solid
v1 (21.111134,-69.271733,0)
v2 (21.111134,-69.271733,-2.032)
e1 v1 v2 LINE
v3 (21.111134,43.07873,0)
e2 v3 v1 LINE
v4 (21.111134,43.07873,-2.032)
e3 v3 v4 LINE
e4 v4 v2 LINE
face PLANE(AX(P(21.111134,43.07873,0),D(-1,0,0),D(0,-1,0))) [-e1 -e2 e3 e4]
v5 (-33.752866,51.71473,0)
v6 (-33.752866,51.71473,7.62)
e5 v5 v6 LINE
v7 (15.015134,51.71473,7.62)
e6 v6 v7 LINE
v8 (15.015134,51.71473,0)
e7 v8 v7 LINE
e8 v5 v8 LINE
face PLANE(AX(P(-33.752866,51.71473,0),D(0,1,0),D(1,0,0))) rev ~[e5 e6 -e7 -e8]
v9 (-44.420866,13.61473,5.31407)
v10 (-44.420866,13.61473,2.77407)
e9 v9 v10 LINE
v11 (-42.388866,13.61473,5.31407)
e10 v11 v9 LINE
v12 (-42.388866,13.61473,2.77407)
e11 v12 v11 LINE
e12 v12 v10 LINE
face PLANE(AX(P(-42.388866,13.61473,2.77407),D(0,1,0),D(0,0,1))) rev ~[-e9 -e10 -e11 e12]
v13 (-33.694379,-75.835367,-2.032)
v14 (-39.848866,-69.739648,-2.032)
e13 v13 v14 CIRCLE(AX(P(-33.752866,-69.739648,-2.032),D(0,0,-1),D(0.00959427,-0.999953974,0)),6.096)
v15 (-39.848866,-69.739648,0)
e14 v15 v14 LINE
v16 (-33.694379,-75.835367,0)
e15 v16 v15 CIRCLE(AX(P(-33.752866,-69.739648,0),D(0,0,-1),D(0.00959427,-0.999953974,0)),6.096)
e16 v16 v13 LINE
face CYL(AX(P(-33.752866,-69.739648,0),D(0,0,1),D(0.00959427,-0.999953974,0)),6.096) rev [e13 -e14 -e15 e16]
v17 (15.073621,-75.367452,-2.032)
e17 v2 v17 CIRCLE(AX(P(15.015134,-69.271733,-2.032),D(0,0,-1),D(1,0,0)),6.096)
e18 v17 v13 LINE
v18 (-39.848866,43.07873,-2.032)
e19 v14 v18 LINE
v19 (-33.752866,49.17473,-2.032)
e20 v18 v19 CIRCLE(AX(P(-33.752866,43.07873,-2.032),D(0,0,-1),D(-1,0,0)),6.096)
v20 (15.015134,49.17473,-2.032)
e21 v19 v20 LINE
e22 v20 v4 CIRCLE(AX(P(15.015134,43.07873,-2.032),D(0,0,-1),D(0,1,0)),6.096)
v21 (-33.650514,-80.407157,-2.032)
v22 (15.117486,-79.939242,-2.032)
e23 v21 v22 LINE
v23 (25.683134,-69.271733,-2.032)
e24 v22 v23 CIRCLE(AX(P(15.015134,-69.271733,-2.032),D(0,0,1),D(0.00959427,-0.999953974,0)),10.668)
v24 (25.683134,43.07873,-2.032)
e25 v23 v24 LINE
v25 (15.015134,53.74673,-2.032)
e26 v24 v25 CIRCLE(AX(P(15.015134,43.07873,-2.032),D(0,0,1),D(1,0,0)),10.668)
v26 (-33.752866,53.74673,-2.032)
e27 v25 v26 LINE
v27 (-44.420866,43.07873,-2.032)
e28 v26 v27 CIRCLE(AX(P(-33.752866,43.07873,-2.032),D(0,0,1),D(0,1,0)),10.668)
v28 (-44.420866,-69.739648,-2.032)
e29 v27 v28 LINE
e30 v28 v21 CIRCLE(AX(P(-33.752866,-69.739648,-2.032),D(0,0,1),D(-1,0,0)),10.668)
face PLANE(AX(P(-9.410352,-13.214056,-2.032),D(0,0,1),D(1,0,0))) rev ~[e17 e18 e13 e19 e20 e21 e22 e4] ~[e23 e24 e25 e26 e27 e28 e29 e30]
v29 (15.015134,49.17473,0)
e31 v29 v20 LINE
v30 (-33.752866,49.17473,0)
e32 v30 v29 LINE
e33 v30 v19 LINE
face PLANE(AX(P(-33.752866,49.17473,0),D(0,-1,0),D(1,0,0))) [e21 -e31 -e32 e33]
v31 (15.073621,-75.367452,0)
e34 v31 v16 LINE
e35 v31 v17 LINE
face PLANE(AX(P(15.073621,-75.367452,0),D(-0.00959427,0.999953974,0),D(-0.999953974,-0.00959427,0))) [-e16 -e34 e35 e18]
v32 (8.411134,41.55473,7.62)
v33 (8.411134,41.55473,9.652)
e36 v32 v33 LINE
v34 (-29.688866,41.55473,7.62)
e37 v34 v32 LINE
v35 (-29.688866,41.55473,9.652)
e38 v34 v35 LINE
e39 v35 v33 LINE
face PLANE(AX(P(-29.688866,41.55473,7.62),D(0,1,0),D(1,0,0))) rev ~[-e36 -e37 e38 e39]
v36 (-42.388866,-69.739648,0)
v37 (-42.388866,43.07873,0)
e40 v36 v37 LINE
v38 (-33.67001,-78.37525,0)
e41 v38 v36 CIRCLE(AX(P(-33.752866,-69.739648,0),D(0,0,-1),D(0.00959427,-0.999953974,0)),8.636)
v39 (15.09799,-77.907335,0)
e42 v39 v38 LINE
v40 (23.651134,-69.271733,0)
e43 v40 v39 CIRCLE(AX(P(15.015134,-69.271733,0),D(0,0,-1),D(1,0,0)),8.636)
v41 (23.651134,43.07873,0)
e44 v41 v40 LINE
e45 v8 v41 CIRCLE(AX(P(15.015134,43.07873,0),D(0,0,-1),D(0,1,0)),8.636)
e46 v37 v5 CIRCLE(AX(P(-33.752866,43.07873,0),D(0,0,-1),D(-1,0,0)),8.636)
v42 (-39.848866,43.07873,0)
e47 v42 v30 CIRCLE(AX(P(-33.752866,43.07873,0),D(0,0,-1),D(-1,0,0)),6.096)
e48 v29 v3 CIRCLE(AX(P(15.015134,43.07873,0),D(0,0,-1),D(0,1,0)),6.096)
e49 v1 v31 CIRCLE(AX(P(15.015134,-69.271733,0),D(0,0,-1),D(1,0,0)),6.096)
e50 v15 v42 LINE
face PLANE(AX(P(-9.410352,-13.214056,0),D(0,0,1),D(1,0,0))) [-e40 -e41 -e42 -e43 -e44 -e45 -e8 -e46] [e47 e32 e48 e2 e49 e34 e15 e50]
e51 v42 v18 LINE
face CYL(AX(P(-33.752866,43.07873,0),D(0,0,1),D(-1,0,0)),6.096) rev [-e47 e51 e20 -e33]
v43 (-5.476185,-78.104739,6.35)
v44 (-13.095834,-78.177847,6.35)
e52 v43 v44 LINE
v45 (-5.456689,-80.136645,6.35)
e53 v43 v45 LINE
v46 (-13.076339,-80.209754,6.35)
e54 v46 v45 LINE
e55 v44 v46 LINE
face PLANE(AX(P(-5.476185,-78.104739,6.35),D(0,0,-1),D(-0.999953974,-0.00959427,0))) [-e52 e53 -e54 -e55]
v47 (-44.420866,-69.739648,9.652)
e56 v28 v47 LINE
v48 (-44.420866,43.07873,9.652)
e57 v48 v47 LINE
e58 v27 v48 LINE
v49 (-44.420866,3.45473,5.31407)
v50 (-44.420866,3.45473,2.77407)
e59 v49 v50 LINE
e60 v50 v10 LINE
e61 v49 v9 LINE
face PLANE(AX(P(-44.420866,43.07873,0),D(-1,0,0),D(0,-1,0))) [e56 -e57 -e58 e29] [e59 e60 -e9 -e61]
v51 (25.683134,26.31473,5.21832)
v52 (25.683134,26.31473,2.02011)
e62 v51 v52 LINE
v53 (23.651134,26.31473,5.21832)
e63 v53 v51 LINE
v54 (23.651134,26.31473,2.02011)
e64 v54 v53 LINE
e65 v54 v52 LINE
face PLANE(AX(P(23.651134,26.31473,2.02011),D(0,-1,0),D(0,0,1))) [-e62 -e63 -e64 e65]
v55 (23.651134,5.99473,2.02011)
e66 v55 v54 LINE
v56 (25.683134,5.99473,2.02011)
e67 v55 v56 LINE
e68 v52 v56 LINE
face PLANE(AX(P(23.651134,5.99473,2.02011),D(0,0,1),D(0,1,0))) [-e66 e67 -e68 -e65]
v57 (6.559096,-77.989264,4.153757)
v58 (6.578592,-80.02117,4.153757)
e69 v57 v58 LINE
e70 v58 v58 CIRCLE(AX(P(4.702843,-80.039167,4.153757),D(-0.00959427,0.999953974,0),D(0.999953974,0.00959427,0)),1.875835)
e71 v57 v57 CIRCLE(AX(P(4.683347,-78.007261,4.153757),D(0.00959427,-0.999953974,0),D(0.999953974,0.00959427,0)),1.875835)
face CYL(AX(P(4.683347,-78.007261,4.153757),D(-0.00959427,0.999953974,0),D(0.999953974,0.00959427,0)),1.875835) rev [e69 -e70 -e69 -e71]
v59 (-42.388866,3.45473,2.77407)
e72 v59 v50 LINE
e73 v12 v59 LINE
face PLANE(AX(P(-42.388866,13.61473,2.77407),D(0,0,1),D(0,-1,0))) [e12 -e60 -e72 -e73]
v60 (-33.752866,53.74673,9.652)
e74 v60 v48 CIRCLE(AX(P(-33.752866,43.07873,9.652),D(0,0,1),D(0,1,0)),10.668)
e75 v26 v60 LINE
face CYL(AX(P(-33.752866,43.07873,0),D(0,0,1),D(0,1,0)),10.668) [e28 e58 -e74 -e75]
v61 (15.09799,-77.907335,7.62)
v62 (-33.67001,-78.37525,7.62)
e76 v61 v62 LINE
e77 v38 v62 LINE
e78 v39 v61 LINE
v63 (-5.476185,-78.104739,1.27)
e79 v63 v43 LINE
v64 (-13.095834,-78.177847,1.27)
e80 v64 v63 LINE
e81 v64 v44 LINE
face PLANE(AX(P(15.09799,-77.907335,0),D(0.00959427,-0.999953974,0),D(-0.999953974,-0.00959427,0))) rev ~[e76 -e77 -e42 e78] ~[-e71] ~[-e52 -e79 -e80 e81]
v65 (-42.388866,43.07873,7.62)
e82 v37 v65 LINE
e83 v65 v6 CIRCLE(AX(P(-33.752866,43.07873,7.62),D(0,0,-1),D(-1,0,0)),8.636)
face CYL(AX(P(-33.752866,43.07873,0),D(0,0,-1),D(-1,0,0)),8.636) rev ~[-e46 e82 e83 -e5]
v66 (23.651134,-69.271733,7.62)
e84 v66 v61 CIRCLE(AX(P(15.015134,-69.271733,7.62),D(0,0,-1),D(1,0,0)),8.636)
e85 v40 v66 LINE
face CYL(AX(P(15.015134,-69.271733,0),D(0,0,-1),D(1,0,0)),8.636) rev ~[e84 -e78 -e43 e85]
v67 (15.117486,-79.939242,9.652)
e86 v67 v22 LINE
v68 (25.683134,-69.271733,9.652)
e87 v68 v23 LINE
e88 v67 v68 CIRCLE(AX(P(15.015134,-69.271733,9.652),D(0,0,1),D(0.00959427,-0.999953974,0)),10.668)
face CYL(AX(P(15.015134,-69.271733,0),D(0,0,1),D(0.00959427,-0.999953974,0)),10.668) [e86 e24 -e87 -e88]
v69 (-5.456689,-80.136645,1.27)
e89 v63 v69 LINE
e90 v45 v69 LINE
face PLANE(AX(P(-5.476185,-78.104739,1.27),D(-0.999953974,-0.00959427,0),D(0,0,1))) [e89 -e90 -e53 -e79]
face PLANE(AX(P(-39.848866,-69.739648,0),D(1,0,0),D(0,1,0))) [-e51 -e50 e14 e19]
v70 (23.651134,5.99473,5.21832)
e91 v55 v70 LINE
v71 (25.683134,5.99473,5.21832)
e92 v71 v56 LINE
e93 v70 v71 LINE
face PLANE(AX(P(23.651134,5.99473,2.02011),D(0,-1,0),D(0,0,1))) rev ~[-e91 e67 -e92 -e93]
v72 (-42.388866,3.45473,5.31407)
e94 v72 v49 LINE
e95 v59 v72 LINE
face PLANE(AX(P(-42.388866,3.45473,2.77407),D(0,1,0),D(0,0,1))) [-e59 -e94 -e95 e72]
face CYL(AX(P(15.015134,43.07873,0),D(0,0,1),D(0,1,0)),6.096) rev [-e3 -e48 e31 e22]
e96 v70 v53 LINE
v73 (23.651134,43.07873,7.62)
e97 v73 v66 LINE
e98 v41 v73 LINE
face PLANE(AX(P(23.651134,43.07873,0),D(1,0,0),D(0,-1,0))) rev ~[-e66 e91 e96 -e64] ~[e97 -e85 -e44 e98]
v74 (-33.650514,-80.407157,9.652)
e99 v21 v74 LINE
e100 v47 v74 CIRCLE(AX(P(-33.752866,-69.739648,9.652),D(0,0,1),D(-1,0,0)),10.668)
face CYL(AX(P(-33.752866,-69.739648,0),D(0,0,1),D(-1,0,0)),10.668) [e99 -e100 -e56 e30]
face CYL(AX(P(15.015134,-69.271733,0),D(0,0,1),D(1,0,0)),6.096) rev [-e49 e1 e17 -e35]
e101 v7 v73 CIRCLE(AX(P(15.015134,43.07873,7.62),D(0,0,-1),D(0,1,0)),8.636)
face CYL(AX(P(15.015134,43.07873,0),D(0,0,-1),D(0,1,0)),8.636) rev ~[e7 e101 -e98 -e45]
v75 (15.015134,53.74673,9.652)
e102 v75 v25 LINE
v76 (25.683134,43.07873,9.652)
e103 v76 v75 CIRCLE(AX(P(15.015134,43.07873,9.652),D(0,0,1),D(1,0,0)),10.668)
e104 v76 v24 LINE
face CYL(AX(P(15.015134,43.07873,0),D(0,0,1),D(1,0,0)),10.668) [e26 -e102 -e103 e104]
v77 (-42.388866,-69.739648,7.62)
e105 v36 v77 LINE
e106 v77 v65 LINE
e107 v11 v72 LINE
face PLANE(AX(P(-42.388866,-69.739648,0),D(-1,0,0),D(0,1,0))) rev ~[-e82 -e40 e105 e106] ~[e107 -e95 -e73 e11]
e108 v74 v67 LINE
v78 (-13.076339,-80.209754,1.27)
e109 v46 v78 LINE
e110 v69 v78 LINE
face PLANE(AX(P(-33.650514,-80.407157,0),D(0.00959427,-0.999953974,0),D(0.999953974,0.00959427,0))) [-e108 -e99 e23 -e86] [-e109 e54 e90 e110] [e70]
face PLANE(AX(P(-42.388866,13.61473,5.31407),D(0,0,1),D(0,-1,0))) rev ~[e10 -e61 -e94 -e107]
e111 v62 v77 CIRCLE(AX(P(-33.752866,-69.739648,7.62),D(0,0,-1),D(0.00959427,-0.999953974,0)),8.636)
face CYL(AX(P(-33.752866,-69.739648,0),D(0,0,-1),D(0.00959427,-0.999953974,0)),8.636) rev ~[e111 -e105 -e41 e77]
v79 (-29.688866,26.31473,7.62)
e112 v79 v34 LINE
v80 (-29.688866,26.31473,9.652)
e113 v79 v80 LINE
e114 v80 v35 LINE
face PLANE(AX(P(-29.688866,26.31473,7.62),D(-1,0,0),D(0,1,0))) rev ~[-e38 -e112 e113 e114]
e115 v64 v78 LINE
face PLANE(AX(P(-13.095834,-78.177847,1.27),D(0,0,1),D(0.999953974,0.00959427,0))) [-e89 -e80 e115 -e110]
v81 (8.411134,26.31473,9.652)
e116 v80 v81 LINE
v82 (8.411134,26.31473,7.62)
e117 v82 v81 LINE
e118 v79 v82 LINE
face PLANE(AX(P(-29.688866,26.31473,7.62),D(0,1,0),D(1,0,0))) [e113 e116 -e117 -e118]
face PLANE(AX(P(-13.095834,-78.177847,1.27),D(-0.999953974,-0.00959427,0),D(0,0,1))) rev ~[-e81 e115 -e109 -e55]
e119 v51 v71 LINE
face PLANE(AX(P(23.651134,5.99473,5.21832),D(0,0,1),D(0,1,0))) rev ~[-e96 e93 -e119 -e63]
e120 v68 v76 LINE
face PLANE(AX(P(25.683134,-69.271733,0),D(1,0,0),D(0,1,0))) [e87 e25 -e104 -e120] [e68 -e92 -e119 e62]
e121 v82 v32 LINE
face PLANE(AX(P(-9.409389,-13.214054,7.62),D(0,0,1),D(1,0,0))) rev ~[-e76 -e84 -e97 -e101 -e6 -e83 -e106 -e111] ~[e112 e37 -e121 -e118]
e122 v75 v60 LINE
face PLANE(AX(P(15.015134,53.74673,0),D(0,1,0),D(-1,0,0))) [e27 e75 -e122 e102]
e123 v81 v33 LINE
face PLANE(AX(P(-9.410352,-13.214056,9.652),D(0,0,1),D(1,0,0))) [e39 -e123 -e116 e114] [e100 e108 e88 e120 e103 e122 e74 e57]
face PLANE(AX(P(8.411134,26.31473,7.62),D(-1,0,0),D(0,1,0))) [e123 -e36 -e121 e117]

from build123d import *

# Parameters (mm, degrees)
F0_W       = 38.1
F0_H       = 15.24
F1_DEPTH   = 7.62
F2_W       = 20.32
F2_H       = 3.1982096843
F3_DEPTH   = 25.4
F5_W       = 10.16
F5_H       = 2.54
F6_DEPTH   = 25.4
F4_W       = 3.81
F4_H       = 5.08
F4_R       = 1.8758350377
F7_DEPTH   = 25.4
F8_DEPTH   = 7.62
F1_FACE3_W = 38.1
F1_FACE3_H = 15.24
F9_DEPTH   = 2.032
F10_DEPTH  = 2.032


with BuildPart() as f1:
    # F0 (on Top) → F1 (new body)
    with BuildSketch(Plane.XY):
        with BuildLine():
            Line((15.0151342493, 51.7147295177), (-33.7528657507, 51.7147295177))
            ThreePointArc((-33.7528657507, 51.7147295177), (-39.8594399131, 49.18530368), (-42.3888657507, 43.0787295177))
            Line((-42.3888657507, 43.0787295177), (-42.3888657507, -69.7396477934))
            ThreePointArc((-42.3888657507, -69.7396477934), (-39.8300752503, -75.8754460869), (-33.6700096372, -78.3752503123))
            Line((-33.6700096372, -78.3752503123), (15.0979903628, -77.9073354291))
            ThreePointArc((15.0979903628, -77.9073354291), (21.1509325427, -75.3489424097), (23.6511342493, -69.2717329101))
            Line((23.6511342493, -69.2717329101), (23.6511342493, 43.0787295177))
            ThreePointArc((23.6511342493, 43.0787295177), (21.1217084116, 49.18530368), (15.0151342493, 51.7147295177))
        make_face()
        with BuildLine():
            ThreePointArc((-39.8488657507, 43.0787295177), (-38.0633886888, 47.3892524558), (-33.7528657507, 49.1747295177))
            Line((-33.7528657507, 49.1747295177), (15.0151342493, 49.1747295177))
            ThreePointArc((15.0151342493, 49.1747295177), (19.3256571874, 47.3892524558), (21.1111342493, 43.0787295177))
            Line((21.1111342493, 43.0787295177), (21.1111342493, -69.2717329101))
            ThreePointArc((21.1111342493, -69.2717329101), (19.3462859858, -73.561527851), (15.0736209176, -75.3674523353))
            Line((15.0736209176, -75.3674523353), (-33.6943790824, -75.8353672185))
            ThreePointArc((-33.6943790824, -75.8353672185), (-38.0426606916, -74.07079953), (-39.8488657507, -69.7396477934))
            Line((-39.8488657507, -69.7396477934), (-39.8488657507, 43.0787295177))
        make_face(mode=Mode.SUBTRACT)
        with BuildLine():
            Line((15.0151342493, 49.1747295177), (-33.7528657507, 49.1747295177))
            ThreePointArc((-33.7528657507, 49.1747295177), (-38.0633886888, 47.3892524558), (-39.8488657507, 43.0787295177))
            Line((-39.8488657507, 43.0787295177), (-39.8488657507, -69.7396477934))
            ThreePointArc((-39.8488657507, -69.7396477934), (-38.0426606916, -74.07079953), (-33.6943790824, -75.8353672185))
            Line((-33.6943790824, -75.8353672185), (15.0736209176, -75.3674523353))
            ThreePointArc((15.0736209176, -75.3674523353), (19.3462859858, -73.561527851), (21.1111342493, -69.2717329101))
            Line((21.1111342493, -69.2717329101), (21.1111342493, 43.0787295177))
            ThreePointArc((21.1111342493, 43.0787295177), (19.3256571874, 47.3892524558), (15.0151342493, 49.1747295177))
        make_face()
        with Locations((-10.6388657507, 33.9347295177)):
            Rectangle(F0_W, F0_H, mode=Mode.SUBTRACT)
    extrude(amount=F1_DEPTH)

    # F2 (on face) → F3 (join)
    with BuildSketch(Plane.YZ.offset(23.6511342493)):
        with Locations((16.1547295177, 3.6192152184)):
            Rectangle(F2_W, F2_H)
    extrude(amount=F3_DEPTH)

    # F5 (on face) → F6 (join)
    with BuildSketch(Plane(origin=(-42.3888657507, 0, 0), x_dir=(0, -1, 0), z_dir=(-1, 0, 0))):
        with Locations((-8.5347295177, 4.0440695514)):
            Rectangle(F5_W, F5_H)
    extrude(amount=F6_DEPTH)

    # F4 (on face) → F7 (join)
    with BuildSketch(Plane(origin=(0.7488193587, -78.045011583, 0), x_dir=(0.9999539739, 0.0095942697, 0), z_dir=(0.0095942697, -0.9999539739, 0))):
        with Locations((-11.9402908808, 3.81)):
            Rectangle(F4_W, F4_H)
        with Locations((-8.1302908808, 3.81)):
            Rectangle(F4_W, F4_H)
        with Locations((3.9347091192, 4.1537573561)):
            Circle(F4_R)
    extrude(amount=F7_DEPTH)


with BuildPart() as f8:
    # F0 (on Top) → F8 (new body, through all)
    with BuildSketch(Plane.XY):
        with BuildLine():
            Line((15.0151342493, 53.7467295177), (-33.7528657507, 53.7467295177))
            ThreePointArc((-33.7528657507, 53.7467295177), (-41.2962808924, 50.6221446594), (-44.4208657507, 43.0787295177))
            Line((-44.4208657507, 43.0787295177), (-44.4208657507, -69.7396477934))
            ThreePointArc((-44.4208657507, -69.7396477934), (-41.2600068973, -77.3191633324), (-33.6505140811, -80.4071567873))
            Line((-33.6505140811, -80.4071567873), (15.1174859189, -79.9392419041))
            ThreePointArc((15.1174859189, -79.9392419041), (22.5946497883, -76.7788740567), (25.6831342493, -69.2717329101))
            Line((25.6831342493, -69.2717329101), (25.6831342493, 43.0787295177))
            ThreePointArc((25.6831342493, 43.0787295177), (22.558549391, 50.6221446594), (15.0151342493, 53.7467295177))
        make_face()
        with BuildLine():
            ThreePointArc((-42.3888657507, 43.0787295177), (-39.8594399131, 49.18530368), (-33.7528657507, 51.7147295177))
            Line((-33.7528657507, 51.7147295177), (15.0151342493, 51.7147295177))
            ThreePointArc((15.0151342493, 51.7147295177), (21.1217084116, 49.18530368), (23.6511342493, 43.0787295177))
            Line((23.6511342493, 43.0787295177), (23.6511342493, -69.2717329101))
            ThreePointArc((23.6511342493, -69.2717329101), (21.1509325427, -75.3489424097), (15.0979903628, -77.9073354291))
            Line((15.0979903628, -77.9073354291), (-33.6700096372, -78.3752503123))
            ThreePointArc((-33.6700096372, -78.3752503123), (-39.8300752503, -75.8754460869), (-42.3888657507, -69.7396477934))
            Line((-42.3888657507, -69.7396477934), (-42.3888657507, 43.0787295177))
        make_face(mode=Mode.SUBTRACT)
    extrude(amount=F8_DEPTH)

    # F8_face (on face) + F1_face3 (on face) → F9 (join)
    with BuildSketch(Plane(origin=(-9.4104092831, -13.214065849, 7.62), x_dir=(1, 0, 0), z_dir=(0, 0, 1))):
        with BuildLine():
            Line((35.0935435324, -56.0576670611), (35.0935435324, 56.2927953667))
            ThreePointArc((35.0935435324, 56.2927953667), (31.9689586741, 63.8362105084), (24.4255435324, 66.9607953667))
            Line((24.4255435324, 66.9607953667), (-24.3424564676, 66.9607953667))
            ThreePointArc((-24.3424564676, 66.9607953667), (-31.8858716093, 63.8362105084), (-35.0104564676, 56.2927953667))
            Line((-35.0104564676, 56.2927953667), (-35.0104564676, -56.5255819444))
            ThreePointArc((-35.0104564676, -56.5255819444), (-31.8495976142, -64.1050974834), (-24.240104798, -67.1930909383))
            Line((-24.240104798, -67.1930909383), (24.527895202, -66.7251760551))
            ThreePointArc((24.527895202, -66.7251760551), (32.0050590714, -63.5648082077), (35.0935435324, -56.0576670611))
        make_face()
        with BuildLine():
            ThreePointArc((-32.9784564676, 56.2927953667), (-30.4490306299, 62.399369529), (-24.3424564676, 64.9287953667))
            Line((-24.3424564676, 64.9287953667), (24.4255435324, 64.9287953667))
            ThreePointArc((24.4255435324, 64.9287953667), (30.5321176947, 62.399369529), (33.0615435324, 56.2927953667))
            Line((33.0615435324, 56.2927953667), (33.0615435324, -56.0576670611))
            ThreePointArc((33.0615435324, -56.0576670611), (30.5613418259, -62.1348765607), (24.5083996459, -64.69326958))
            Line((24.5083996459, -64.69326958), (-24.2596003541, -65.1611844633))
            ThreePointArc((-24.2596003541, -65.1611844633), (-30.4196659672, -62.6613802378), (-32.9784564676, -56.5255819444))
            Line((-32.9784564676, -56.5255819444), (-32.9784564676, 56.2927953667))
        make_face(mode=Mode.SUBTRACT)
    with BuildSketch(Plane(origin=(-9.3022040754, -16.6655356146, 7.62), x_dir=(1, 0, 0), z_dir=(0, 0, 1))):
        with BuildLine():
            ThreePointArc((32.9533383247, 59.7442651323), (30.423912487, 65.8508392946), (24.3173383247, 68.3802651323))
            Line((24.3173383247, 68.3802651323), (-24.4506616753, 68.3802651323))
            ThreePointArc((-24.4506616753, 68.3802651323), (-30.5572358376, 65.8508392946), (-33.0866616753, 59.7442651323))
            Line((-33.0866616753, 59.7442651323), (-33.0866616753, -53.0741121788))
            ThreePointArc((-33.0866616753, -53.0741121788), (-30.5278711749, -59.2099104723), (-24.3678055618, -61.7097146977))
            Line((-24.3678055618, -61.7097146977), (24.4001944382, -61.2417998145))
            ThreePointArc((24.4001944382, -61.2417998145), (30.4531366182, -58.6834067951), (32.9533383247, -52.6061972956))
            Line((32.9533383247, -52.6061972956), (32.9533383247, 59.7442651323))
        make_face()
        with Locations((-1.3366616753, 50.6002651323)):
            Rectangle(F1_FACE3_W, F1_FACE3_H, mode=Mode.SUBTRACT)
    extrude(amount=F9_DEPTH)

    # F0 (on Top) → F10 (join)
    with BuildSketch(Plane.XY):
        with BuildLine():
            Line((15.0151342493, 53.7467295177), (-33.7528657507, 53.7467295177))
            ThreePointArc((-33.7528657507, 53.7467295177), (-41.2962808924, 50.6221446594), (-44.4208657507, 43.0787295177))
            Line((-44.4208657507, 43.0787295177), (-44.4208657507, -69.7396477934))
            ThreePointArc((-44.4208657507, -69.7396477934), (-41.2600068973, -77.3191633324), (-33.6505140811, -80.4071567873))
            Line((-33.6505140811, -80.4071567873), (15.1174859189, -79.9392419041))
            ThreePointArc((15.1174859189, -79.9392419041), (22.5946497883, -76.7788740567), (25.6831342493, -69.2717329101))
            Line((25.6831342493, -69.2717329101), (25.6831342493, 43.0787295177))
            ThreePointArc((25.6831342493, 43.0787295177), (22.558549391, 50.6221446594), (15.0151342493, 53.7467295177))
        make_face()
        with BuildLine():
            ThreePointArc((-42.3888657507, 43.0787295177), (-39.8594399131, 49.18530368), (-33.7528657507, 51.7147295177))
            Line((-33.7528657507, 51.7147295177), (15.0151342493, 51.7147295177))
            ThreePointArc((15.0151342493, 51.7147295177), (21.1217084116, 49.18530368), (23.6511342493, 43.0787295177))
            Line((23.6511342493, 43.0787295177), (23.6511342493, -69.2717329101))
            ThreePointArc((23.6511342493, -69.2717329101), (21.1509325427, -75.3489424097), (15.0979903628, -77.9073354291))
            Line((15.0979903628, -77.9073354291), (-33.6700096372, -78.3752503123))
            ThreePointArc((-33.6700096372, -78.3752503123), (-39.8300752503, -75.8754460869), (-42.3888657507, -69.7396477934))
            Line((-42.3888657507, -69.7396477934), (-42.3888657507, 43.0787295177))
        make_face(mode=Mode.SUBTRACT)
        with BuildLine():
            Line((15.0151342493, 51.7147295177), (-33.7528657507, 51.7147295177))
            ThreePointArc((-33.7528657507, 51.7147295177), (-39.8594399131, 49.18530368), (-42.3888657507, 43.0787295177))
            Line((-42.3888657507, 43.0787295177), (-42.3888657507, -69.7396477934))
            ThreePointArc((-42.3888657507, -69.7396477934), (-39.8300752503, -75.8754460869), (-33.6700096372, -78.3752503123))
            Line((-33.6700096372, -78.3752503123), (15.0979903628, -77.9073354291))
            ThreePointArc((15.0979903628, -77.9073354291), (21.1509325427, -75.3489424097), (23.6511342493, -69.2717329101))
            Line((23.6511342493, -69.2717329101), (23.6511342493, 43.0787295177))
            ThreePointArc((23.6511342493, 43.0787295177), (21.1217084116, 49.18530368), (15.0151342493, 51.7147295177))
        make_face()
        with BuildLine():
            ThreePointArc((-39.8488657507, 43.0787295177), (-38.0633886888, 47.3892524558), (-33.7528657507, 49.1747295177))
            Line((-33.7528657507, 49.1747295177), (15.0151342493, 49.1747295177))
            ThreePointArc((15.0151342493, 49.1747295177), (19.3256571874, 47.3892524558), (21.1111342493, 43.0787295177))
            Line((21.1111342493, 43.0787295177), (21.1111342493, -69.2717329101))
            ThreePointArc((21.1111342493, -69.2717329101), (19.3462859858, -73.561527851), (15.0736209176, -75.3674523353))
            Line((15.0736209176, -75.3674523353), (-33.6943790824, -75.8353672185))
            ThreePointArc((-33.6943790824, -75.8353672185), (-38.0426606916, -74.07079953), (-39.8488657507, -69.7396477934))
            Line((-39.8488657507, -69.7396477934), (-39.8488657507, 43.0787295177))
        make_face(mode=Mode.SUBTRACT)
    extrude(amount=-F10_DEPTH)

    # F11: cut F1
    add(f1.part, mode=Mode.SUBTRACT)


solid = f8.part
